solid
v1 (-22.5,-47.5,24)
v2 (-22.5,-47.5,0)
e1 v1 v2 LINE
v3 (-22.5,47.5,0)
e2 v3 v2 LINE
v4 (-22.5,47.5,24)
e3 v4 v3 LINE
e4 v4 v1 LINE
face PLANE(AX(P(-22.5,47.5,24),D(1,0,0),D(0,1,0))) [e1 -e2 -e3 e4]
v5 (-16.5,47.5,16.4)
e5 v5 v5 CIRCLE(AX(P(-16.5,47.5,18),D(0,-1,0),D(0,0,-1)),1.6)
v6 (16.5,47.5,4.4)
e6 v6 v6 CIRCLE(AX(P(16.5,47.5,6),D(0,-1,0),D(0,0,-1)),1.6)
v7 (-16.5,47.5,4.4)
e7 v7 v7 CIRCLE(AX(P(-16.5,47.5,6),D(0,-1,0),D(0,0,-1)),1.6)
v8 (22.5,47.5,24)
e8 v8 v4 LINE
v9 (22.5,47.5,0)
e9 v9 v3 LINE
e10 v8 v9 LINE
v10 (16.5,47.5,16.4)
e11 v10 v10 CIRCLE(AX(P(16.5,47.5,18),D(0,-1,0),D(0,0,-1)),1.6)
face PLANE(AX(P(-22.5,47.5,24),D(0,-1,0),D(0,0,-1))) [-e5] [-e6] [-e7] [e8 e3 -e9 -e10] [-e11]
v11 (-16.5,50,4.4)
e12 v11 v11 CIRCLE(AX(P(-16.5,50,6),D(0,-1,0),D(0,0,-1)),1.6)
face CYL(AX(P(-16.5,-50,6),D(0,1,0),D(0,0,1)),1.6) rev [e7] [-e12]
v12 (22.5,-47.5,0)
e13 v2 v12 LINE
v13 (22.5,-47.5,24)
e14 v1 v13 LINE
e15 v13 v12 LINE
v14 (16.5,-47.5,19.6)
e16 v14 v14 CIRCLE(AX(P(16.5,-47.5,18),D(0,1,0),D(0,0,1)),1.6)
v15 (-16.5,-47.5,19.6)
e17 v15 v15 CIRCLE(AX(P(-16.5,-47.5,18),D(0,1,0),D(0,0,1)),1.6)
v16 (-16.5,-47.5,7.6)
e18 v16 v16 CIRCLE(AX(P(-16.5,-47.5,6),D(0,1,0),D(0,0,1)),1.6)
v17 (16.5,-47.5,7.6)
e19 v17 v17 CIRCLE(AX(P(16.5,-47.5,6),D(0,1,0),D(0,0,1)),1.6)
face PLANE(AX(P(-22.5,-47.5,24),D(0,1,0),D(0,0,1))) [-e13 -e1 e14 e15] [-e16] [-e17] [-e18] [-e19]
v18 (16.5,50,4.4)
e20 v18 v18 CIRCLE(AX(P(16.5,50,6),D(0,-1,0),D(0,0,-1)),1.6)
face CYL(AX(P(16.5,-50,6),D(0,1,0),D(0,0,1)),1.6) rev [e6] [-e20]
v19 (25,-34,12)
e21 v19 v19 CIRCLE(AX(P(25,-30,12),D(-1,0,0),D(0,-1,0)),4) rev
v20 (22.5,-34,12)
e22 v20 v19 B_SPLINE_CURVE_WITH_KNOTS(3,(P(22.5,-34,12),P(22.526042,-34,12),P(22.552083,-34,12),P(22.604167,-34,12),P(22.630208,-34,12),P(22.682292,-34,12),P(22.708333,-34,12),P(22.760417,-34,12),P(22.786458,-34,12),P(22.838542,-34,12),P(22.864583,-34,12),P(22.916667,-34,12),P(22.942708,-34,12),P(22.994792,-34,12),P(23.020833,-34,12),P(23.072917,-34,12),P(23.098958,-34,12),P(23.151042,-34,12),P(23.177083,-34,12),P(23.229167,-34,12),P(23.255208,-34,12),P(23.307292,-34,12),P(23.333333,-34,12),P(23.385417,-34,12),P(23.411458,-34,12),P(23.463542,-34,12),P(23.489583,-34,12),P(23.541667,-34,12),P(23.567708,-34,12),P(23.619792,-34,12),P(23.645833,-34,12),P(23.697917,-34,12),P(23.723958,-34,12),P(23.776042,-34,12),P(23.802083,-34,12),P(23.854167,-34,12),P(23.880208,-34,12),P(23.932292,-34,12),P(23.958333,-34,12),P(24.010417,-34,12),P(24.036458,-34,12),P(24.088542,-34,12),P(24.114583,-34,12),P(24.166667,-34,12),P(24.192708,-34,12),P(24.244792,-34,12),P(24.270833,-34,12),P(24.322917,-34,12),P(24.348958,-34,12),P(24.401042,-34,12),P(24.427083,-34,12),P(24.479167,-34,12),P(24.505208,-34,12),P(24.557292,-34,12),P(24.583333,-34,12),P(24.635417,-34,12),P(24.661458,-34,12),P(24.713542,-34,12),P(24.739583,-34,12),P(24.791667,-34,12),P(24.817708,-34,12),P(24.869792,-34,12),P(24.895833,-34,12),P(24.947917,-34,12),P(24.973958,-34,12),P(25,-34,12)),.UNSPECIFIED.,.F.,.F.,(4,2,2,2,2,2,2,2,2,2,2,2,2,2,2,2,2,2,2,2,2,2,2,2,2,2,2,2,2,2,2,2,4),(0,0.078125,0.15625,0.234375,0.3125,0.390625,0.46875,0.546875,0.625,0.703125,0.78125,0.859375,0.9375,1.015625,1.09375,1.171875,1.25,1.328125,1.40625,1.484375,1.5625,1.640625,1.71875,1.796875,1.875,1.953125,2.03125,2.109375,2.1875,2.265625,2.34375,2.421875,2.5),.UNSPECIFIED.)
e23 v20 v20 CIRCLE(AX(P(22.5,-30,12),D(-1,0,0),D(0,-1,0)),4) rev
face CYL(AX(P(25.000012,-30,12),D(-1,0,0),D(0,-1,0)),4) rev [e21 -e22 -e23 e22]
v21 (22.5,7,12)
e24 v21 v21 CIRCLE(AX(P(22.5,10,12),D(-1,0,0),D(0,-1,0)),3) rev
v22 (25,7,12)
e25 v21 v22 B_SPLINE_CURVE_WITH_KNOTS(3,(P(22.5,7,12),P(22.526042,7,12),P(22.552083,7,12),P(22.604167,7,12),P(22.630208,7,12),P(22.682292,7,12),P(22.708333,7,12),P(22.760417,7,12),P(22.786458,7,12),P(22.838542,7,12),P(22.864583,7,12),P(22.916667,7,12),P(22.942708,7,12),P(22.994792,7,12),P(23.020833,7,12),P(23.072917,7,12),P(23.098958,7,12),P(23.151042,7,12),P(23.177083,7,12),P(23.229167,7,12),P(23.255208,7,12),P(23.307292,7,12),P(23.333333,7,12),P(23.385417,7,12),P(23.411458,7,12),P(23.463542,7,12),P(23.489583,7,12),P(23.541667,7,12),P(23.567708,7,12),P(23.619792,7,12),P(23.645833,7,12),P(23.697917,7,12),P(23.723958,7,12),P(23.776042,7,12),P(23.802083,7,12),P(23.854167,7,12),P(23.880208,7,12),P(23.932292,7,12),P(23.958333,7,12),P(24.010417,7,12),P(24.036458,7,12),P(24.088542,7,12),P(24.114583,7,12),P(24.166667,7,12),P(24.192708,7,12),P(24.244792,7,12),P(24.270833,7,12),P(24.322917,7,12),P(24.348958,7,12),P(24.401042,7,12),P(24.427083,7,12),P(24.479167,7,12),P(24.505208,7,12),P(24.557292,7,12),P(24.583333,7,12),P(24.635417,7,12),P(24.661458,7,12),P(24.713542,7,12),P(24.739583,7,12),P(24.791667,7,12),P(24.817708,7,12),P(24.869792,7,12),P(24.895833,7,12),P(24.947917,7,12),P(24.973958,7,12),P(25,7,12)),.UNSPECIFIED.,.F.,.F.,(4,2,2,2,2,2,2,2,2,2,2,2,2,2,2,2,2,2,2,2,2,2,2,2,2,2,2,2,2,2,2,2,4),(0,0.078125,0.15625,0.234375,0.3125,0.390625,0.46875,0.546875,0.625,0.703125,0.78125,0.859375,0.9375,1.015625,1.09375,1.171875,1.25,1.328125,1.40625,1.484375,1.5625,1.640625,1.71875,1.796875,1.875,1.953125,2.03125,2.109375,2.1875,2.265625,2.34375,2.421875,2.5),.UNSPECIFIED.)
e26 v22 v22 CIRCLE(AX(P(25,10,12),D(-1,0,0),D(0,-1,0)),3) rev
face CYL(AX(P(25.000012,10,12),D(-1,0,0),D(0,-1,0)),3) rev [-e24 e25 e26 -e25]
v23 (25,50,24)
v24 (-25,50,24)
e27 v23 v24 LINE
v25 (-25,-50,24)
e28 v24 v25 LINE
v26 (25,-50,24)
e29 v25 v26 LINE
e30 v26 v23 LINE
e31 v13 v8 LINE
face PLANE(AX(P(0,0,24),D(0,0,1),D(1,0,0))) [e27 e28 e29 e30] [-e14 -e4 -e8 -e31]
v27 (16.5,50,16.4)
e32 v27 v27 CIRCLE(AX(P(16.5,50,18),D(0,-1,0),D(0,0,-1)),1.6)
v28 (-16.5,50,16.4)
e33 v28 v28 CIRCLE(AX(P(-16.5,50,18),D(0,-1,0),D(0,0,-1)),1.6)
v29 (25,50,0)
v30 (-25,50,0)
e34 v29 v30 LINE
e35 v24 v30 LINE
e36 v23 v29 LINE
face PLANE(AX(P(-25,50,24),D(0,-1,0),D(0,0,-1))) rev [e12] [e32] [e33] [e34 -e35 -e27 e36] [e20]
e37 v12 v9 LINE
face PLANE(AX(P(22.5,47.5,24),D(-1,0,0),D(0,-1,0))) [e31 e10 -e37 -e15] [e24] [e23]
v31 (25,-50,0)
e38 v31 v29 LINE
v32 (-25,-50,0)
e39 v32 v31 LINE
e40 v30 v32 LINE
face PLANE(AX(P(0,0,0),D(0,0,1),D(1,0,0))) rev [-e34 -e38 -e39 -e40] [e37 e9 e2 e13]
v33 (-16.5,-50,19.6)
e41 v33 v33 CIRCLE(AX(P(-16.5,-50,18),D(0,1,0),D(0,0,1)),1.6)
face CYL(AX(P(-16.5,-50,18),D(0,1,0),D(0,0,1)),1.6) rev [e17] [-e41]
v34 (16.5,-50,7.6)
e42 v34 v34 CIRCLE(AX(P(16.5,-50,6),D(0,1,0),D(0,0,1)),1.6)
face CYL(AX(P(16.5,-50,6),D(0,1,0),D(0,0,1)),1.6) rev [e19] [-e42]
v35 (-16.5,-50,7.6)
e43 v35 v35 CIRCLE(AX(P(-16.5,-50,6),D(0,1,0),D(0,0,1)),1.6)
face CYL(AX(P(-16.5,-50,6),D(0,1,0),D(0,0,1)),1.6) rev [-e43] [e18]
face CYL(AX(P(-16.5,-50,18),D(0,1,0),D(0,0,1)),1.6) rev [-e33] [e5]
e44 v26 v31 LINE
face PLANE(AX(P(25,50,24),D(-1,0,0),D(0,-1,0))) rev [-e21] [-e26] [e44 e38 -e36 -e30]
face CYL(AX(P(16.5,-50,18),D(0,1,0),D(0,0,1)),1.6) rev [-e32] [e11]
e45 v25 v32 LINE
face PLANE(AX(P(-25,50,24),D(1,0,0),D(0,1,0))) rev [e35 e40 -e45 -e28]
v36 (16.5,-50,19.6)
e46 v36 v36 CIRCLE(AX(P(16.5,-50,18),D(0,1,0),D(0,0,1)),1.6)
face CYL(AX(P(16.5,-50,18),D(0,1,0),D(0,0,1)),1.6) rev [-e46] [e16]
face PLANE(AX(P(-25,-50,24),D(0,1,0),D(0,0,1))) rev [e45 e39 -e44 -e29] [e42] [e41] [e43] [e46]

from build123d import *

# Parameters (mm, degrees)
SKETCH_1_W                      = 50
SKETCH_1_H                      = 100
SKETCH_1_W_2                    = 45
SKETCH_1_H_2                    = 95
EXTRUDE_1_DEPTH                 = 24
CUT_EXTRUDE_2_DEPTH             = 106.834776893
CUT_EXTRUDE_2_DEPTH_BACK        = 106.834776893
SKETCH_3_R                      = 1.6
CUT_EXTRUDE_3_REACH             = 76.673
SKETCH_4_R                      = 3
SKETCH_4_R_2                    = 4
CUT_EXTRUDE_3_DIRECTION_2_DEPTH = 75.67261881


with BuildPart() as part:
    # ｽｹｯﾁ1 → ﾎﾞｽ - 押し出し1 (new body)
    with BuildSketch(Plane.XY):
        Rectangle(SKETCH_1_W, SKETCH_1_H)
        Rectangle(SKETCH_1_W_2, SKETCH_1_H_2, mode=Mode.SUBTRACT)
    extrude(amount=EXTRUDE_1_DEPTH)

    # ｽｹｯﾁ3 → ｶｯﾄ - 押し出し2 (cut, two sides: drawn at the far end of the back side and taken through both)
    with BuildSketch(Plane(origin=(0, 50, 0), x_dir=(1, 0, 0), z_dir=(0, 1, 0)).offset(-CUT_EXTRUDE_2_DEPTH_BACK)):
        with Locations(Location((-16.5, -6, 0), (0, 0, 90))):
            Circle(SKETCH_3_R)
        with Locations(Location((16.5, -6, 0), (0, 0, 90))):
            Circle(SKETCH_3_R)
        with Locations(Location((16.5, -18, 0), (0, 0, 90))):
            Circle(SKETCH_3_R)
        with Locations(Location((-16.5, -18, 0), (0, 0, 90))):
            Circle(SKETCH_3_R)
    extrude(amount=CUT_EXTRUDE_2_DEPTH + CUT_EXTRUDE_2_DEPTH_BACK, mode=Mode.SUBTRACT)

    # ｽｹｯﾁ4 → ｶｯﾄ - 押し出し3 (cut, up to next)
    with BuildSketch(Plane(origin=(25, 0, 0), x_dir=(0, 0, -1), z_dir=(1, 0, 0)), mode=Mode.PRIVATE) as cut_extrude_3_sk1:
        with Locations(Location((-12, 10, 0), (0, 0, 270))):
            Circle(SKETCH_4_R)
    cut_extrude_3_tool1 = extrude(cut_extrude_3_sk1.sketch, amount=-CUT_EXTRUDE_3_REACH, mode=Mode.PRIVATE) & part.part
    # ｽｹｯﾁ4 → ｶｯﾄ - 押し出し3 (cut, up to next)
    with BuildSketch(Plane(origin=(25, 0, 0), x_dir=(0, 0, -1), z_dir=(1, 0, 0)), mode=Mode.PRIVATE) as cut_extrude_3_sk2:
        with Locations(Location((-12, -30, 0), (0, 0, 270))):
            Circle(SKETCH_4_R_2)
    cut_extrude_3_tool2 = extrude(cut_extrude_3_sk2.sketch, amount=-CUT_EXTRUDE_3_REACH, mode=Mode.PRIVATE) & part.part
    add(cut_extrude_3_tool1.solids().sort_by_distance((25, 10, 12))[0], mode=Mode.SUBTRACT)
    add(cut_extrude_3_tool2.solids().sort_by_distance((25, -30, 12))[0], mode=Mode.SUBTRACT)

    # ｽｹｯﾁ4 → ｶｯﾄ - 押し出し3 direction 2 (cut)
    with BuildSketch(Plane(origin=(25, 0, 0), x_dir=(0, 0, -1), z_dir=(1, 0, 0))):
        with Locations(Location((-12, 10, 0), (0, 0, 270))):
            Circle(SKETCH_4_R)
        with Locations(Location((-12, -30, 0), (0, 0, 270))):
            Circle(SKETCH_4_R_2)
    extrude(amount=CUT_EXTRUDE_3_DIRECTION_2_DEPTH, mode=Mode.SUBTRACT)


solid = part.part
